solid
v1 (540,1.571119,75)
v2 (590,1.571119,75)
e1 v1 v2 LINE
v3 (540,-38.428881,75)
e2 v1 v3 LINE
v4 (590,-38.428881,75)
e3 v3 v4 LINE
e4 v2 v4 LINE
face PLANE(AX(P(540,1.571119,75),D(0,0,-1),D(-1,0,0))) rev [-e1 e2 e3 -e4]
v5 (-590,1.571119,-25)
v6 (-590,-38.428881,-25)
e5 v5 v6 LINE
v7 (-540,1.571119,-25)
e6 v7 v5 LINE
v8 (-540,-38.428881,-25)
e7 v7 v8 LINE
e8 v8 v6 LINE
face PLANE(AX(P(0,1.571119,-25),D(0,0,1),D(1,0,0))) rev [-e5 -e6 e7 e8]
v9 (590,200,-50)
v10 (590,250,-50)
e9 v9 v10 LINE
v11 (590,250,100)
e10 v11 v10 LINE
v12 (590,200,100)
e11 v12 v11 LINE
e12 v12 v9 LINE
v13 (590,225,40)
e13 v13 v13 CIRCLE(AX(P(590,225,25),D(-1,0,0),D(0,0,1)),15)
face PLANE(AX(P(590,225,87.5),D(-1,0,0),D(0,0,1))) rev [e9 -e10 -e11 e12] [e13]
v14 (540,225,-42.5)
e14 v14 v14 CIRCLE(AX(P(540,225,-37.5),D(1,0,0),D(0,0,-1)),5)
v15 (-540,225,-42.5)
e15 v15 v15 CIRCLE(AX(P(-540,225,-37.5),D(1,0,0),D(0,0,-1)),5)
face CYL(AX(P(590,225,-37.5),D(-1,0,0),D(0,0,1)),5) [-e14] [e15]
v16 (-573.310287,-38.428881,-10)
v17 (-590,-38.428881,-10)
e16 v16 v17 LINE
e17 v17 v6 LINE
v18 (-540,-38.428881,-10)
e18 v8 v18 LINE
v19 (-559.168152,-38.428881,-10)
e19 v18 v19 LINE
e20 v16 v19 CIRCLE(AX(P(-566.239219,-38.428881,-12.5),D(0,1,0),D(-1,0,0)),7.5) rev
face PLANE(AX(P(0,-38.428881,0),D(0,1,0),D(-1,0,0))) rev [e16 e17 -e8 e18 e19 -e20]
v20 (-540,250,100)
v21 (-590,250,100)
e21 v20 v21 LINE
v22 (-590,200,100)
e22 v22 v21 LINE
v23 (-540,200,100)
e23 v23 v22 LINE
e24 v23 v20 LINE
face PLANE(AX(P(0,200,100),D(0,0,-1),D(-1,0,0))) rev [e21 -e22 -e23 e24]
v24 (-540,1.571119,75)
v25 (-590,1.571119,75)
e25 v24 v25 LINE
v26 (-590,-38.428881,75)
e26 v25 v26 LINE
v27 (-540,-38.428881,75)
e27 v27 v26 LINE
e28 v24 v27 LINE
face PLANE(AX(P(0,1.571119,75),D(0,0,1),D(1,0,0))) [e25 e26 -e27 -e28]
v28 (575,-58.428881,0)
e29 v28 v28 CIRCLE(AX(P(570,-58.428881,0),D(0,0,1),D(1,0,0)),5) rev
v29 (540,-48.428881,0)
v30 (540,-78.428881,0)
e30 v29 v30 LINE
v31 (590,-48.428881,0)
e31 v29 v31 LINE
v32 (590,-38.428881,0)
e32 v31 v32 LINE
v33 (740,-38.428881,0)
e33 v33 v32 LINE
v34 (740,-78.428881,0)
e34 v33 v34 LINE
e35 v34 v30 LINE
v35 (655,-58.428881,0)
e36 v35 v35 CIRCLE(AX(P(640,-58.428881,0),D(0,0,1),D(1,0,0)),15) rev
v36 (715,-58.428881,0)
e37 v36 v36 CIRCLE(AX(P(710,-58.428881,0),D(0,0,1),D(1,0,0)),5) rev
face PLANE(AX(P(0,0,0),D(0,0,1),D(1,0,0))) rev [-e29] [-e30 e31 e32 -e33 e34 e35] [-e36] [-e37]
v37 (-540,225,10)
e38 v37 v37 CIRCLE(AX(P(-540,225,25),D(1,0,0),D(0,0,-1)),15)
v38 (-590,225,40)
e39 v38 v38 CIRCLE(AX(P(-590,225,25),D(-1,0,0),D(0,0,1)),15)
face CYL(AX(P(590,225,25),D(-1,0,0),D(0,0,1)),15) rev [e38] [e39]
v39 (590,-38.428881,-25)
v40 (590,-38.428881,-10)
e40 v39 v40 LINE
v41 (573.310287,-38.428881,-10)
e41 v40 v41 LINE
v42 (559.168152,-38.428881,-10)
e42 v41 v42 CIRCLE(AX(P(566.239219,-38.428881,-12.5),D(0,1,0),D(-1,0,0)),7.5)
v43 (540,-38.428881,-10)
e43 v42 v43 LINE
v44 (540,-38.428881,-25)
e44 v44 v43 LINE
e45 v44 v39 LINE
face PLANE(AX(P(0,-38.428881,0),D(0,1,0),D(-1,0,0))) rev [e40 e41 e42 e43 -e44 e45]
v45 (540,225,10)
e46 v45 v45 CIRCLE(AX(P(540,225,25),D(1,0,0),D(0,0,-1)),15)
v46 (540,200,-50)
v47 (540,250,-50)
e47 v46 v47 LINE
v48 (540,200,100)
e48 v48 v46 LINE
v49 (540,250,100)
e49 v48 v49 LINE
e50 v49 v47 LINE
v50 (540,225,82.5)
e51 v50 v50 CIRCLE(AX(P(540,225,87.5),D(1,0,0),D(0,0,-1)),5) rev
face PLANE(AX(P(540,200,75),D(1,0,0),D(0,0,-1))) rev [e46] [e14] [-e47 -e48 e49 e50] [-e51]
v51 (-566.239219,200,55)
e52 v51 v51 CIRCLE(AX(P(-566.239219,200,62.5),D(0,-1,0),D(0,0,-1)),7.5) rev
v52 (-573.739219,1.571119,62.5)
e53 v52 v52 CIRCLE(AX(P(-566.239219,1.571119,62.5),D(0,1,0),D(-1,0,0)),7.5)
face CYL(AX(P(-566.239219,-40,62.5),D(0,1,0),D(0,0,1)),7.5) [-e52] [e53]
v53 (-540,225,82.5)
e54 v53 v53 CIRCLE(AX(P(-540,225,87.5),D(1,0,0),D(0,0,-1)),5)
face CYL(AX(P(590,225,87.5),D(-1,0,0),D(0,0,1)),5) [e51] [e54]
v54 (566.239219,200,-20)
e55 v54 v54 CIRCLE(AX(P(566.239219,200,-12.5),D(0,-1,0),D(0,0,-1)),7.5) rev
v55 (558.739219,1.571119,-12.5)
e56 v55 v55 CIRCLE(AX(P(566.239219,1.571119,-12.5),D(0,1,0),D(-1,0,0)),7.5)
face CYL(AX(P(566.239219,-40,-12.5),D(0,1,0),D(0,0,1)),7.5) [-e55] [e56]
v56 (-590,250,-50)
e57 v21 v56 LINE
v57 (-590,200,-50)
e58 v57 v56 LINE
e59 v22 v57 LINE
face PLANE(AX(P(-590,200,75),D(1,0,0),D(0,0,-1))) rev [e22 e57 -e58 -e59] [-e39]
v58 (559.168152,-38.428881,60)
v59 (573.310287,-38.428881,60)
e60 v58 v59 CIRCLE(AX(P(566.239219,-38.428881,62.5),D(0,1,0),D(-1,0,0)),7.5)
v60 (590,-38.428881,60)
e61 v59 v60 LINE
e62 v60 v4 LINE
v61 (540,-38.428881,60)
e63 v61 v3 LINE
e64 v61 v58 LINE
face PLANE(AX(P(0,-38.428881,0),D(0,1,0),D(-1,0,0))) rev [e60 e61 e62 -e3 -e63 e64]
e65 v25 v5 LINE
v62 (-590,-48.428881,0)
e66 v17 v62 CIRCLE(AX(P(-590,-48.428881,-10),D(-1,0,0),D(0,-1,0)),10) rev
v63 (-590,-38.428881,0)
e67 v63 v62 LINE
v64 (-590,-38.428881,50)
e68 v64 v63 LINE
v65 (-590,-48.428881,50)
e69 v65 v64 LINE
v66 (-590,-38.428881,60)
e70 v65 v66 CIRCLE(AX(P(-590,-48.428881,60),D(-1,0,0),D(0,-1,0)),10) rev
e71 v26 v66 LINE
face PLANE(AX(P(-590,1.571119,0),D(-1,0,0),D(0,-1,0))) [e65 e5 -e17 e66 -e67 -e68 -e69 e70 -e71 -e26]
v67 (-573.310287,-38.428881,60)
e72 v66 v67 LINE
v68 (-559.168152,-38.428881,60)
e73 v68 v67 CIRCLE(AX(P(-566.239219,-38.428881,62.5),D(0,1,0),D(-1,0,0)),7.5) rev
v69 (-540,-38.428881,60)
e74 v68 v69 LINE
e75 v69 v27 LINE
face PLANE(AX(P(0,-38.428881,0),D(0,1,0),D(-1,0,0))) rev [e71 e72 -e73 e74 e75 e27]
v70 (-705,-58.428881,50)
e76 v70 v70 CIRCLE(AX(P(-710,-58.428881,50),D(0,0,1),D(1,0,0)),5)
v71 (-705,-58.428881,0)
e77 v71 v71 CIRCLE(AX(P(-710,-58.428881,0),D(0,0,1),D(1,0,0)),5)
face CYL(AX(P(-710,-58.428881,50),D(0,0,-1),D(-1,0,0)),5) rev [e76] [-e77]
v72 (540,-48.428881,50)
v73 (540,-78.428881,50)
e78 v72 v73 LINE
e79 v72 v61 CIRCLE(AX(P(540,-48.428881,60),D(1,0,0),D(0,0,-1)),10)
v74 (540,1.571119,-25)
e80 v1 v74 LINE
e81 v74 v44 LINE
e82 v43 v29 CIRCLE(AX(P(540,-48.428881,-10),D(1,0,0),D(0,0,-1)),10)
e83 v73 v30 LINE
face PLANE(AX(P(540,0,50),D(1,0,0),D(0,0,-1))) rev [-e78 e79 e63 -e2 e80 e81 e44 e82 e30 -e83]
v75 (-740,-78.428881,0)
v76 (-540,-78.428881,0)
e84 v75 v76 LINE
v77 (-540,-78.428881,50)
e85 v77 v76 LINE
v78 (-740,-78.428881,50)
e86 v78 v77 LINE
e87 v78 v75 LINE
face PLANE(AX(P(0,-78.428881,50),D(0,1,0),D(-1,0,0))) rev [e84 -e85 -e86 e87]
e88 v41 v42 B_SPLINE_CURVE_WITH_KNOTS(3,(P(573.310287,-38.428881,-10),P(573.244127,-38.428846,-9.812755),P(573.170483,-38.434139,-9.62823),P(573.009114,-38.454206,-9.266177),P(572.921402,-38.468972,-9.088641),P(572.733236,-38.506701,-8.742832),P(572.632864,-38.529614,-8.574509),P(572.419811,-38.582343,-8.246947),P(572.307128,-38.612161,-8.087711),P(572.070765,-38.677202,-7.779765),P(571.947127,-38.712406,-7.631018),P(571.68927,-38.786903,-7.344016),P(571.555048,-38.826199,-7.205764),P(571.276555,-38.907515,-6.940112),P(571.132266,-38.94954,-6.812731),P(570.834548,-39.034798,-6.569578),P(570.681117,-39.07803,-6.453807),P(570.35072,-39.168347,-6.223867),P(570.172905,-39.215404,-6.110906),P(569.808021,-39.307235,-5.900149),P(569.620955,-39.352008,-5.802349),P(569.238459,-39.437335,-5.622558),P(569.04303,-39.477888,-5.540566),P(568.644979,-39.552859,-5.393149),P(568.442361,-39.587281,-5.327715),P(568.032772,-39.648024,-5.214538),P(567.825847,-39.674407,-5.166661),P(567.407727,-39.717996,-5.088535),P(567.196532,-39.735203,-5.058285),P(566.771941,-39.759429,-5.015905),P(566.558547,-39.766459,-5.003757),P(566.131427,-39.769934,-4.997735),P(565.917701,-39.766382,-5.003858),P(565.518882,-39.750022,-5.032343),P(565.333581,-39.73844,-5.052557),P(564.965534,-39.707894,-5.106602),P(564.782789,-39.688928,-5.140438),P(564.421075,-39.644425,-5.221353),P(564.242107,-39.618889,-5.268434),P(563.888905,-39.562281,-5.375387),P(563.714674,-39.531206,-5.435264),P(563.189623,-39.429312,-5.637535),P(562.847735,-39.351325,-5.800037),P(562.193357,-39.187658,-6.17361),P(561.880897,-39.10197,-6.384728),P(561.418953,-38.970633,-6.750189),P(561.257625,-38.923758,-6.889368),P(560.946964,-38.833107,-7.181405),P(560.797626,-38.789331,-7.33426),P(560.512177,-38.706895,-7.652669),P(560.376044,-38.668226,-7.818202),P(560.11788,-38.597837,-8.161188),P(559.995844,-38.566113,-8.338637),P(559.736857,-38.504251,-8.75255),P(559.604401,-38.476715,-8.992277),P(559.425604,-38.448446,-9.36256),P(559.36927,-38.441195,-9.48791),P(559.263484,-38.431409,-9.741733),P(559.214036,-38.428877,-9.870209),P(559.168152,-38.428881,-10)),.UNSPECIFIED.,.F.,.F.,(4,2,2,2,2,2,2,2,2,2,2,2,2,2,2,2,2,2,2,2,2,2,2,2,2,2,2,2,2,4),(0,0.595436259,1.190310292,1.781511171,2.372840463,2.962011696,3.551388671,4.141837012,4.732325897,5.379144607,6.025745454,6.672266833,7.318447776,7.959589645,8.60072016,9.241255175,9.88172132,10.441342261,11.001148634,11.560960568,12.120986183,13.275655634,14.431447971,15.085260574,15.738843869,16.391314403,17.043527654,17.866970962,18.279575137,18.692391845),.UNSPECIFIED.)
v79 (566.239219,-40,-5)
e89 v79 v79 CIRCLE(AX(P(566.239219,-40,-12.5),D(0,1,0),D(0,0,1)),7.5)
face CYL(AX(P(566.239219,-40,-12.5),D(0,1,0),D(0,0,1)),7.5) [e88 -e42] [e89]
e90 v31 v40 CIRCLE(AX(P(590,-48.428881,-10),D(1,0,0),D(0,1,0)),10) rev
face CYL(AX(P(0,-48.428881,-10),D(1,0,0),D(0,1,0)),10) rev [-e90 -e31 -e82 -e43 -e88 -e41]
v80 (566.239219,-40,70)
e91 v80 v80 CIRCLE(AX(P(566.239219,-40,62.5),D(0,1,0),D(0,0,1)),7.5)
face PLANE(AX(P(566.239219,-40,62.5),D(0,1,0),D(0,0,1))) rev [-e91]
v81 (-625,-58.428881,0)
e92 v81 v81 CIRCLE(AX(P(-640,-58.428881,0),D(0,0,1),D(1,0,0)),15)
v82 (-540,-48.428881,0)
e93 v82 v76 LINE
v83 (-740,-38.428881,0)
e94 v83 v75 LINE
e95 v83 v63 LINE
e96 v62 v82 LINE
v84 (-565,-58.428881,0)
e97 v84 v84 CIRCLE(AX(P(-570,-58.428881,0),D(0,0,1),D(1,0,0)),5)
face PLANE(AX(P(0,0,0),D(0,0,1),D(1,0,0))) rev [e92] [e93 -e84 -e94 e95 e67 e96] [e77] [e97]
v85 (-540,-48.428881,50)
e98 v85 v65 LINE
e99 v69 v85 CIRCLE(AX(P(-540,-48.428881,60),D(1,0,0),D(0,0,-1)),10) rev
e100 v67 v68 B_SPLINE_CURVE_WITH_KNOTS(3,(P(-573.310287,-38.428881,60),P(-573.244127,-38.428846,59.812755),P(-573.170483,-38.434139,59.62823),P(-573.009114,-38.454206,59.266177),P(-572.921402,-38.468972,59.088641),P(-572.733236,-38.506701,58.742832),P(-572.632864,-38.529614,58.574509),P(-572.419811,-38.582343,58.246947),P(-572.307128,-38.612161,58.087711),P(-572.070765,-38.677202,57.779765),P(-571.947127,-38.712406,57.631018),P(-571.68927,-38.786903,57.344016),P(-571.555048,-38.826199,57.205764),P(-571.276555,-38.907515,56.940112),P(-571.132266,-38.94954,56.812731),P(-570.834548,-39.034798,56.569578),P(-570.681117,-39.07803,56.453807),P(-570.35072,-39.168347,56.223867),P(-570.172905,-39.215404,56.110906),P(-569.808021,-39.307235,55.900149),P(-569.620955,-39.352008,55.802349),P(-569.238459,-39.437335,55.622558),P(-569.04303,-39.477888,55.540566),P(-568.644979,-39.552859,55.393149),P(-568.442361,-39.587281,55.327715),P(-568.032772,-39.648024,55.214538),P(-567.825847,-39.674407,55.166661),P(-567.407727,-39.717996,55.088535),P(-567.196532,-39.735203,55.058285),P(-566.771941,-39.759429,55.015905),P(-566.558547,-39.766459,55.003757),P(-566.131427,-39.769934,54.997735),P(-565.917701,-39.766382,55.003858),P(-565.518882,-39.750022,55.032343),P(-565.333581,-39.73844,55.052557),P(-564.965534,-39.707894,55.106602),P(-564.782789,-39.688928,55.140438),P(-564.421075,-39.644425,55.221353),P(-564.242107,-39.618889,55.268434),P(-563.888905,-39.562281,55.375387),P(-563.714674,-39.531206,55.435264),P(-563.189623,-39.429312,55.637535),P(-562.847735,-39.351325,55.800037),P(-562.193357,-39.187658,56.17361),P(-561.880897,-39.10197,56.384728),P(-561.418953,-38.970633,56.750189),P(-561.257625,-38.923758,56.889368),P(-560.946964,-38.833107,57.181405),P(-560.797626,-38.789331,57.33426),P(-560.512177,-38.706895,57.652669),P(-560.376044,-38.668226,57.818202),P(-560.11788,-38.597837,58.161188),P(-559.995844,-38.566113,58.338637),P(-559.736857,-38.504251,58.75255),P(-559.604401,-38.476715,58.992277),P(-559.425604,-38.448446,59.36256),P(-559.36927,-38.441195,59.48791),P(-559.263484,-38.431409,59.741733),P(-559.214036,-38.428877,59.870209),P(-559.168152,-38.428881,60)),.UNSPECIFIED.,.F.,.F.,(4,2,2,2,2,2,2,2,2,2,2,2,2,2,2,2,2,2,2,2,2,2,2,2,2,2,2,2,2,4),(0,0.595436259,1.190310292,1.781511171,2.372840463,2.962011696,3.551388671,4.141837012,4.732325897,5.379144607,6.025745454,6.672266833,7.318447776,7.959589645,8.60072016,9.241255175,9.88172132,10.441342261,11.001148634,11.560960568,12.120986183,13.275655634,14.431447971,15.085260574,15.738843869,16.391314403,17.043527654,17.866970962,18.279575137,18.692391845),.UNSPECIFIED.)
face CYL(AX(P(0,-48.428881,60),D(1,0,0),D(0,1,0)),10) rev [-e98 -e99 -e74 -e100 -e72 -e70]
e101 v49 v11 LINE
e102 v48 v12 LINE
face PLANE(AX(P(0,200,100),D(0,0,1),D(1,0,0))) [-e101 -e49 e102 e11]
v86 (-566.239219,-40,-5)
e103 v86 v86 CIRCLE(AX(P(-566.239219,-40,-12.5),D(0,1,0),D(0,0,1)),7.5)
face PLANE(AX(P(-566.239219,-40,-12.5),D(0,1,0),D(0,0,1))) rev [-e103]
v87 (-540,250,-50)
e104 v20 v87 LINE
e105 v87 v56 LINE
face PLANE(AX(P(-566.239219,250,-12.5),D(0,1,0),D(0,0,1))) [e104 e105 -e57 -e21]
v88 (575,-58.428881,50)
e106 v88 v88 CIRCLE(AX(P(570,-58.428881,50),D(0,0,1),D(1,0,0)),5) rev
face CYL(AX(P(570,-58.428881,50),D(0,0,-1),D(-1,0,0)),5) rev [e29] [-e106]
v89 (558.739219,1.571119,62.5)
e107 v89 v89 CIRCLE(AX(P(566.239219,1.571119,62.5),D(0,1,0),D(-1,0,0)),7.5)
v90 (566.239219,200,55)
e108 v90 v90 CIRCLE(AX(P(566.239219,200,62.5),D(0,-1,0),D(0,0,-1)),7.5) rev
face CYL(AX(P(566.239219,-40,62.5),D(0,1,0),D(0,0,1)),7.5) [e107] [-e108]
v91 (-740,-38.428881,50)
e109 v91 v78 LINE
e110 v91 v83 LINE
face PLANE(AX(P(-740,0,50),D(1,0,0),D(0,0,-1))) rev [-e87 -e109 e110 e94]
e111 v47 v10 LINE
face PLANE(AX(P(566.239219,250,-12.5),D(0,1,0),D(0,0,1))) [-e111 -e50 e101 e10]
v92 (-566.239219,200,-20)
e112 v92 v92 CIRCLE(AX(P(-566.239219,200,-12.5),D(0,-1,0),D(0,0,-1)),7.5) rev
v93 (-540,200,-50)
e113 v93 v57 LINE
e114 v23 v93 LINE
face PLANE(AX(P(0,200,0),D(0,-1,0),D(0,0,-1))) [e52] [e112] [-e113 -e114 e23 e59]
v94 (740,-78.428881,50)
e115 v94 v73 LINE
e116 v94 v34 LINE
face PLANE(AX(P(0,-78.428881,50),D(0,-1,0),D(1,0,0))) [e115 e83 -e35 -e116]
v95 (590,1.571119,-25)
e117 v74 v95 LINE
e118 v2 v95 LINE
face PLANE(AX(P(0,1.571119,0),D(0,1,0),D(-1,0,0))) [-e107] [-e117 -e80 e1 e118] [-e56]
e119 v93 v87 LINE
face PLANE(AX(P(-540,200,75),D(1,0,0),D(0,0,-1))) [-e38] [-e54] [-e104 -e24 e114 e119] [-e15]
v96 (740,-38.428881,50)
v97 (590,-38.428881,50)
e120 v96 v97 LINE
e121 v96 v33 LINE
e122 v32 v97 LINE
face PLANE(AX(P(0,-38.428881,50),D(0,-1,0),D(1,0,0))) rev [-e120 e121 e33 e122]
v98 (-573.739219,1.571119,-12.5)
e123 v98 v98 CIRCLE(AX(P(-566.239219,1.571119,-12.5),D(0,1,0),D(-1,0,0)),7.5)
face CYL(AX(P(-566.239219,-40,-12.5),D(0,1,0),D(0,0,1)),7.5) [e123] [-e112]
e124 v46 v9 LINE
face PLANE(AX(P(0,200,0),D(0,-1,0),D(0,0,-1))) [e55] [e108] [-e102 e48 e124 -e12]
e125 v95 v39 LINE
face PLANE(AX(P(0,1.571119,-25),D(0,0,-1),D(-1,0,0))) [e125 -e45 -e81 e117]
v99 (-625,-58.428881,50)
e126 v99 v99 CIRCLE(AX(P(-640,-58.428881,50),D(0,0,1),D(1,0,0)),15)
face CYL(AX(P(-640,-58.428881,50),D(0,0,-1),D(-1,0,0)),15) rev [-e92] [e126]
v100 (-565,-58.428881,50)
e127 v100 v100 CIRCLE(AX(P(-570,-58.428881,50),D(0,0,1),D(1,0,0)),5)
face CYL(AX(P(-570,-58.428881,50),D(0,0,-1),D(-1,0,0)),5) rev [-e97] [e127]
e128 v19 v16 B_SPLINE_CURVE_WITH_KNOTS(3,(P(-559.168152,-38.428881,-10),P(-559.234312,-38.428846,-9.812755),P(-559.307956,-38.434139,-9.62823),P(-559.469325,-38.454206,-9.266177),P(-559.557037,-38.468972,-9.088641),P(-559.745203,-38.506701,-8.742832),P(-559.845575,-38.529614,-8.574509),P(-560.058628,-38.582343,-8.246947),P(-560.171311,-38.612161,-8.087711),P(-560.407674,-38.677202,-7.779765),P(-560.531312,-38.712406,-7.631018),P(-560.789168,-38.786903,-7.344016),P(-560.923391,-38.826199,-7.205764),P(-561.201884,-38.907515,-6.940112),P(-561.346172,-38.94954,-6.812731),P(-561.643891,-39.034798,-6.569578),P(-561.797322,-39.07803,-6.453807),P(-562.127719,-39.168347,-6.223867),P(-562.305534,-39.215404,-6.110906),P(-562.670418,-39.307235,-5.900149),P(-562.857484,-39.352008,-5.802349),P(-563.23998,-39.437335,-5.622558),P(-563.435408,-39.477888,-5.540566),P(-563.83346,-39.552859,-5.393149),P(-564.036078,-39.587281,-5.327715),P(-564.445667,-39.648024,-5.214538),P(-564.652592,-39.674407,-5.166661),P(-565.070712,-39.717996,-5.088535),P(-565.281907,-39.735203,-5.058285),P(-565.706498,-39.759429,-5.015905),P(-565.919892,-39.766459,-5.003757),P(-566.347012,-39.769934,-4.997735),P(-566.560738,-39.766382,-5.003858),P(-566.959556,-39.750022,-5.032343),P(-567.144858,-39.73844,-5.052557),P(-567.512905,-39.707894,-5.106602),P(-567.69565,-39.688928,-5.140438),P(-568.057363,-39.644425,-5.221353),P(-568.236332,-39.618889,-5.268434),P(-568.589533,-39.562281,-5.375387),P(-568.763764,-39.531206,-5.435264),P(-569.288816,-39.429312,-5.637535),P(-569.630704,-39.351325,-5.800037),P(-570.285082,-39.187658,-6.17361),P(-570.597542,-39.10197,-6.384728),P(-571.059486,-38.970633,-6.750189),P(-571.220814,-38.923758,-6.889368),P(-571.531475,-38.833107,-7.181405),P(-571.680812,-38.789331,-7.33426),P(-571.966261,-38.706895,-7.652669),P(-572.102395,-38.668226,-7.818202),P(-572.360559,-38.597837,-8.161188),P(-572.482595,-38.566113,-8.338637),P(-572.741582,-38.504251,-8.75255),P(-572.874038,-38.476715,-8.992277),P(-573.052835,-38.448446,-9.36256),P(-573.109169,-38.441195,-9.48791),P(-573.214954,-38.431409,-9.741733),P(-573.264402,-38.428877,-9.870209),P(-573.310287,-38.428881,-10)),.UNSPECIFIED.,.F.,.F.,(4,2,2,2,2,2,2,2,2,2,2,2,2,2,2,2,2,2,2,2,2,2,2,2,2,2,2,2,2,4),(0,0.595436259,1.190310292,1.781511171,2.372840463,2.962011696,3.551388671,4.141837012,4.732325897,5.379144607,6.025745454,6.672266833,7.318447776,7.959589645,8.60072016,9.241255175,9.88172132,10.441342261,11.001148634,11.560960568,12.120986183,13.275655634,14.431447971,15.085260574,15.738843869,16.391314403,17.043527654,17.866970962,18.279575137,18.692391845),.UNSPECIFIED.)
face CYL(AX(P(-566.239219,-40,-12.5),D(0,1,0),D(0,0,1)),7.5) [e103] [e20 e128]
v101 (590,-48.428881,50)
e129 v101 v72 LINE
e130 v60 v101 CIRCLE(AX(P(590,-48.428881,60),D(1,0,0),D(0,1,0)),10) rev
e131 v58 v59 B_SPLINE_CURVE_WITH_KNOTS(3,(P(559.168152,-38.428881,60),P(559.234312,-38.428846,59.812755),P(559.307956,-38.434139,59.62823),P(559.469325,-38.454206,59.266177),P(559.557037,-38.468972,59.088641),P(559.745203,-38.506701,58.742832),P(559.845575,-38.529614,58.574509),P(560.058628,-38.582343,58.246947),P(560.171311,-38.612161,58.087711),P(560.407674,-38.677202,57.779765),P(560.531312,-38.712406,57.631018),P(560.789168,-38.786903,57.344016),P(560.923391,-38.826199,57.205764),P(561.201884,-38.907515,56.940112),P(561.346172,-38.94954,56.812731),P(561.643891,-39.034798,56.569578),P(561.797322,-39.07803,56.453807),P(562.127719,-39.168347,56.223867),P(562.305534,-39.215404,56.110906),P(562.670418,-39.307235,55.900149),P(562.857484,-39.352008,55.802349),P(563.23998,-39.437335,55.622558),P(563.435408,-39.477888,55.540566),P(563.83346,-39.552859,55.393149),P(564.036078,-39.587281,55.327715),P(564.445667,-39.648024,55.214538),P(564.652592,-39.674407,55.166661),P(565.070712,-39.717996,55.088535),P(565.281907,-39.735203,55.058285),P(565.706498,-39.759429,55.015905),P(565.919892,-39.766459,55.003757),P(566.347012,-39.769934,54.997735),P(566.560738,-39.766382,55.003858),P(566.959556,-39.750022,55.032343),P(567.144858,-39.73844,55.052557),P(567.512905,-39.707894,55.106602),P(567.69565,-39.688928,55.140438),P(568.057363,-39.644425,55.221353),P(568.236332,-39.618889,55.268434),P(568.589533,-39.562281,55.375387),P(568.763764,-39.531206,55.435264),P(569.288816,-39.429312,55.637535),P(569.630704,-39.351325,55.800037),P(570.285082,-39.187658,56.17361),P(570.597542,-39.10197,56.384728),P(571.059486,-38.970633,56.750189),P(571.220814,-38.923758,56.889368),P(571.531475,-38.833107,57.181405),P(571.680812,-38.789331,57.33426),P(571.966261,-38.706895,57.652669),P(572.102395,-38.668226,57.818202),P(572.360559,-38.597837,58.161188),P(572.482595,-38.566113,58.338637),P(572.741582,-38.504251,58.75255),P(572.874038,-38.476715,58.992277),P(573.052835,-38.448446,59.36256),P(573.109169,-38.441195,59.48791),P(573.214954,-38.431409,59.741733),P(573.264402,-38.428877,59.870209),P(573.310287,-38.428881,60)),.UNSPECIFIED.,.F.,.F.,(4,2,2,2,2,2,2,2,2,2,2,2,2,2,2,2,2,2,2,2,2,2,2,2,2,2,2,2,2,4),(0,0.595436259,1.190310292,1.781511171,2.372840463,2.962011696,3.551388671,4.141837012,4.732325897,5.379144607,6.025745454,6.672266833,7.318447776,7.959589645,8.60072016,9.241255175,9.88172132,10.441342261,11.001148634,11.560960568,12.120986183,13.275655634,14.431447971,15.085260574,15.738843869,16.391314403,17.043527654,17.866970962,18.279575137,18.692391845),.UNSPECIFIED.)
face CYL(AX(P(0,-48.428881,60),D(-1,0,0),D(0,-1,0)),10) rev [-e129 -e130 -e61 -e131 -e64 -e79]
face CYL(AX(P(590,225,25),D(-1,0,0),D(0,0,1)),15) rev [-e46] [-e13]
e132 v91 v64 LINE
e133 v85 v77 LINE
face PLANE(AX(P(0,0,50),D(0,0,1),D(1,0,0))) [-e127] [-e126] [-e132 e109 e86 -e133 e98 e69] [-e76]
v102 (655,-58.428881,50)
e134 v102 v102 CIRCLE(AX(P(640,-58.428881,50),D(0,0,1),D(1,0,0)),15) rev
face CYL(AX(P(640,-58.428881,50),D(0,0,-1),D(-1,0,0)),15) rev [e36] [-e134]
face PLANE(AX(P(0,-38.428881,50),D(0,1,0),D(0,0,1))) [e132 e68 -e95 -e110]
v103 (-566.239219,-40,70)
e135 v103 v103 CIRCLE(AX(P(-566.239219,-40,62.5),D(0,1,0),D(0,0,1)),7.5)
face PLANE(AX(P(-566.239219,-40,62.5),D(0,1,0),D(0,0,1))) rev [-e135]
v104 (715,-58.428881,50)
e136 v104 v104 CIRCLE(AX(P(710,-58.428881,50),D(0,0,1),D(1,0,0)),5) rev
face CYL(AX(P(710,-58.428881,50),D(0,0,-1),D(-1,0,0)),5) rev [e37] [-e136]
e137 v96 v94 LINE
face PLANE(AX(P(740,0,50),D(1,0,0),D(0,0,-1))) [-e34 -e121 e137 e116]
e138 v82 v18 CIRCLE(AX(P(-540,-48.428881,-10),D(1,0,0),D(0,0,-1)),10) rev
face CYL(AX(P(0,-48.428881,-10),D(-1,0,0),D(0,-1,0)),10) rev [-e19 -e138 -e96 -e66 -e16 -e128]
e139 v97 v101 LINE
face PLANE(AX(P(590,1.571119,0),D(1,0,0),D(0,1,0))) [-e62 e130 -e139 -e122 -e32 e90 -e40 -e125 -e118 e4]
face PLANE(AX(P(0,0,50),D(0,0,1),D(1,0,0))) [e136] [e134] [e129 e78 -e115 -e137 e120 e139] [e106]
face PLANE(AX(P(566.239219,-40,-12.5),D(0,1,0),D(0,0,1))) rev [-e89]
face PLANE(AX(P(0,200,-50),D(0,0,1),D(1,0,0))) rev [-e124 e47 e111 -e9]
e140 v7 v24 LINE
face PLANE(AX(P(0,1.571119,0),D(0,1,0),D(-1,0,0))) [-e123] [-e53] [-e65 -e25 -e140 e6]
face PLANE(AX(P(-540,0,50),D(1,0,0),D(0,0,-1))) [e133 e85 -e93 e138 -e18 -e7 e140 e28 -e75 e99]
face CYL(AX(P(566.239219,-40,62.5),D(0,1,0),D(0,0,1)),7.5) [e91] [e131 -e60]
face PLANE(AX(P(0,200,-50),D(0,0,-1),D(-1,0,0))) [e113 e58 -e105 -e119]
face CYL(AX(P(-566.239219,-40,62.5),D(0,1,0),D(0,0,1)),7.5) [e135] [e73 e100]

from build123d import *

# Parameters (mm, degrees)
SKETCH1_W                = 200
SKETCH1_H                = 40
SKETCH1_R                = 5
SKETCH1_R_2              = 15
BOSS_EXTRUDE2_DEPTH      = 50
BOSS_EXTRUDE2_2_DEPTH    = 50
SKETCH2_R                = 7.5
BOSS_EXTRUDE4_DEPTH      = 40
BOSS_EXTRUDE5_DEPTH      = 250
BOSS_EXTRUDE5_DEPTH_BACK = 40
SKETCH3_R                = 7.5
SKETCH4_W                = 50
SKETCH4_H                = 100
BOSS_EXTRUDE6_DEPTH      = 50
SKETCH5_R                = 15
CUT_EXTRUDE1_DEPTH       = 1180
SKETCH6_W                = 50
SKETCH6_H                = 25
BOSS_EXTRUDE8_DEPTH      = 50
SKETCH7_R                = 5
BOSS_EXTRUDE9_DEPTH      = 1180
FILLET1_R                = 10


with BuildPart() as part:
    # Sketch1 → Boss-Extrude2 (new body)
    with BuildSketch(Plane.XY):
        with Locations((-640, -58.42888126)):
            Rectangle(SKETCH1_W, SKETCH1_H)
        with Locations((-710, -58.42888126)):
            Circle(SKETCH1_R, mode=Mode.SUBTRACT)
        with Locations((-570, -58.42888126)):
            Circle(SKETCH1_R, mode=Mode.SUBTRACT)
        with Locations((-640, -58.42888126)):
            Circle(SKETCH1_R_2, mode=Mode.SUBTRACT)
    extrude(amount=BOSS_EXTRUDE2_DEPTH)



with BuildPart() as body_2:
    # Sketch1 → Boss-Extrude2 2 (new body)
    with BuildSketch(Plane.XY):
        Polygon((580, -38.42888126), (540, -38.42888126), (540, -78.42888126), (740, -78.42888126), (740, -38.42888126), align=None)
        with Locations((570, -58.42888126)):
            Circle(SKETCH1_R, mode=Mode.SUBTRACT)
        with Locations((640, -58.42888126)):
            Circle(SKETCH1_R_2, mode=Mode.SUBTRACT)
        with Locations((710, -58.42888126)):
            Circle(SKETCH1_R, mode=Mode.SUBTRACT)
    extrude(amount=BOSS_EXTRUDE2_2_DEPTH)


with BuildPart() as part_1:
    add(part.part)

    add(body_2.part)  # Boss-Extrude4 merges body 2
    # Sketch2 → Boss-Extrude4 (add)
    # profile 1 of 2: a face of its own
    with BuildSketch(Plane(origin=(0, -38.42888126, 0), x_dir=(1, 0, 0), z_dir=(0, 1, 0))):
        Polygon((540, -25), (540, -75), (590, -75), (590, -25), (590, 25), (540, 25), align=None)
        with Locations(Location((566.239219394, 12.5, 0), (0, 0, 180))):
            Circle(SKETCH2_R, mode=Mode.SUBTRACT)
        with Locations(Location((566.239219394, -62.5, 0), (0, 0, 180))):
            Circle(SKETCH2_R, mode=Mode.SUBTRACT)
    # profile 2 of 2: a face of its own
    with BuildSketch(Plane(origin=(0, -38.42888126, 0), x_dir=(1, 0, 0), z_dir=(0, 1, 0))):
        Polygon((-590, -25), (-590, 25), (-540, 25), (-540, -25), (-540, -75), (-590, -75), align=None)
        with Locations(Location((-566.239219394, -62.5, 0), (0, 0, 180))):
            Circle(SKETCH2_R, mode=Mode.SUBTRACT)
        with Locations(Location((-566.239219394, 12.5, 0), (0, 0, 180))):
            Circle(SKETCH2_R, mode=Mode.SUBTRACT)
    extrude(amount=BOSS_EXTRUDE4_DEPTH)

    # Sketch3 → Boss-Extrude5 (add, two sides: drawn at the far end of the back side and taken through both)
    with BuildSketch(Plane(origin=(0, 0, 0), x_dir=(1, 0, 0), z_dir=(0, 1, 0)).offset(-BOSS_EXTRUDE5_DEPTH_BACK)):
        with Locations(Location((-566.239219394, 12.5, 0), (0, 0, 270))):
            Circle(SKETCH3_R)
        with Locations(Location((-566.239219394, -62.5, 0), (0, 0, 270))):
            Circle(SKETCH3_R)
        with Locations(Location((566.239219394, 12.5, 0), (0, 0, 270))):
            Circle(SKETCH3_R)
        with Locations(Location((566.239219394, -62.5, 0), (0, 0, 270))):
            Circle(SKETCH3_R)
    extrude(amount=BOSS_EXTRUDE5_DEPTH + BOSS_EXTRUDE5_DEPTH_BACK)

    # Sketch4 → Boss-Extrude6 (add)
    with BuildSketch(Plane(origin=(0, 250, 0), x_dir=(1, 0, 0), z_dir=(0, 1, 0))):
        with Locations((565, -25)):
            Rectangle(SKETCH4_W, SKETCH4_H)
        with Locations((-565, -25)):
            Rectangle(SKETCH4_W, SKETCH4_H)
    extrude(amount=-BOSS_EXTRUDE6_DEPTH)

    # Sketch5 → Cut-Extrude1 (cut)
    with BuildSketch(Plane.ZY.offset(590)):
        with Locations((25, 225)):
            Circle(SKETCH5_R)
    extrude(amount=-CUT_EXTRUDE1_DEPTH, mode=Mode.SUBTRACT)

    # Sketch6 → Boss-Extrude8 (add)
    with BuildSketch(Plane(origin=(0, 250, 0), x_dir=(1, 0, 0), z_dir=(0, 1, 0))):
        with Locations((565, -87.5)):
            Rectangle(SKETCH6_W, SKETCH6_H)
        with Locations((565, 37.5)):
            Rectangle(SKETCH6_W, SKETCH6_H)
        with Locations((-565, -87.5)):
            Rectangle(SKETCH6_W, SKETCH6_H)
        with Locations((-565, 37.5)):
            Rectangle(SKETCH6_W, SKETCH6_H)
    extrude(amount=-BOSS_EXTRUDE8_DEPTH)

    # Sketch7 → Boss-Extrude9 (add)
    with BuildSketch(Plane.ZY.offset(590)):
        with Locations(Location((87.5, 225, 0), (0, 0, 180))):
            Circle(SKETCH7_R)
        with Locations(Location((-37.5, 225, 0), (0, 0, 180))):
            Circle(SKETCH7_R)
    extrude(amount=-BOSS_EXTRUDE9_DEPTH)

    # Fillet1
    # the kernel refuses this fillet: 10 mm, written as the material it adds along each edge
    with BuildSketch(Plane(origin=(540, -38.42888126, 50), x_dir=(0, -1, 0), z_dir=(1, 0, 0)), Plane(origin=(590, -38.42888126, 0), x_dir=(0, -1, 0), z_dir=(-1, 0, 0)), Plane(origin=(-590, -38.42888126, 0), x_dir=(0, 0, -1), z_dir=(1, 0, 0))) as fillet1_piece_1:
        with BuildLine():
            CenterArc((FILLET1_R, -FILLET1_R), FILLET1_R, 90, 90)
            Line((0, -FILLET1_R), (0, 0))
            Line((0, 0), (FILLET1_R, 0))
        make_face()
    extrude(amount=50)
    with BuildSketch(Plane(origin=(-590, -38.42888126, 50), x_dir=(0, 0, 1), z_dir=(1, 0, 0))) as fillet1_piece_2:
        with BuildLine():
            CenterArc((FILLET1_R, FILLET1_R), FILLET1_R, 180, 90)
            Line((0, FILLET1_R), (0, 0))
            Line((0, 0), (FILLET1_R, 0))
        make_face()
    extrude(amount=50)


solid = part_1.part
